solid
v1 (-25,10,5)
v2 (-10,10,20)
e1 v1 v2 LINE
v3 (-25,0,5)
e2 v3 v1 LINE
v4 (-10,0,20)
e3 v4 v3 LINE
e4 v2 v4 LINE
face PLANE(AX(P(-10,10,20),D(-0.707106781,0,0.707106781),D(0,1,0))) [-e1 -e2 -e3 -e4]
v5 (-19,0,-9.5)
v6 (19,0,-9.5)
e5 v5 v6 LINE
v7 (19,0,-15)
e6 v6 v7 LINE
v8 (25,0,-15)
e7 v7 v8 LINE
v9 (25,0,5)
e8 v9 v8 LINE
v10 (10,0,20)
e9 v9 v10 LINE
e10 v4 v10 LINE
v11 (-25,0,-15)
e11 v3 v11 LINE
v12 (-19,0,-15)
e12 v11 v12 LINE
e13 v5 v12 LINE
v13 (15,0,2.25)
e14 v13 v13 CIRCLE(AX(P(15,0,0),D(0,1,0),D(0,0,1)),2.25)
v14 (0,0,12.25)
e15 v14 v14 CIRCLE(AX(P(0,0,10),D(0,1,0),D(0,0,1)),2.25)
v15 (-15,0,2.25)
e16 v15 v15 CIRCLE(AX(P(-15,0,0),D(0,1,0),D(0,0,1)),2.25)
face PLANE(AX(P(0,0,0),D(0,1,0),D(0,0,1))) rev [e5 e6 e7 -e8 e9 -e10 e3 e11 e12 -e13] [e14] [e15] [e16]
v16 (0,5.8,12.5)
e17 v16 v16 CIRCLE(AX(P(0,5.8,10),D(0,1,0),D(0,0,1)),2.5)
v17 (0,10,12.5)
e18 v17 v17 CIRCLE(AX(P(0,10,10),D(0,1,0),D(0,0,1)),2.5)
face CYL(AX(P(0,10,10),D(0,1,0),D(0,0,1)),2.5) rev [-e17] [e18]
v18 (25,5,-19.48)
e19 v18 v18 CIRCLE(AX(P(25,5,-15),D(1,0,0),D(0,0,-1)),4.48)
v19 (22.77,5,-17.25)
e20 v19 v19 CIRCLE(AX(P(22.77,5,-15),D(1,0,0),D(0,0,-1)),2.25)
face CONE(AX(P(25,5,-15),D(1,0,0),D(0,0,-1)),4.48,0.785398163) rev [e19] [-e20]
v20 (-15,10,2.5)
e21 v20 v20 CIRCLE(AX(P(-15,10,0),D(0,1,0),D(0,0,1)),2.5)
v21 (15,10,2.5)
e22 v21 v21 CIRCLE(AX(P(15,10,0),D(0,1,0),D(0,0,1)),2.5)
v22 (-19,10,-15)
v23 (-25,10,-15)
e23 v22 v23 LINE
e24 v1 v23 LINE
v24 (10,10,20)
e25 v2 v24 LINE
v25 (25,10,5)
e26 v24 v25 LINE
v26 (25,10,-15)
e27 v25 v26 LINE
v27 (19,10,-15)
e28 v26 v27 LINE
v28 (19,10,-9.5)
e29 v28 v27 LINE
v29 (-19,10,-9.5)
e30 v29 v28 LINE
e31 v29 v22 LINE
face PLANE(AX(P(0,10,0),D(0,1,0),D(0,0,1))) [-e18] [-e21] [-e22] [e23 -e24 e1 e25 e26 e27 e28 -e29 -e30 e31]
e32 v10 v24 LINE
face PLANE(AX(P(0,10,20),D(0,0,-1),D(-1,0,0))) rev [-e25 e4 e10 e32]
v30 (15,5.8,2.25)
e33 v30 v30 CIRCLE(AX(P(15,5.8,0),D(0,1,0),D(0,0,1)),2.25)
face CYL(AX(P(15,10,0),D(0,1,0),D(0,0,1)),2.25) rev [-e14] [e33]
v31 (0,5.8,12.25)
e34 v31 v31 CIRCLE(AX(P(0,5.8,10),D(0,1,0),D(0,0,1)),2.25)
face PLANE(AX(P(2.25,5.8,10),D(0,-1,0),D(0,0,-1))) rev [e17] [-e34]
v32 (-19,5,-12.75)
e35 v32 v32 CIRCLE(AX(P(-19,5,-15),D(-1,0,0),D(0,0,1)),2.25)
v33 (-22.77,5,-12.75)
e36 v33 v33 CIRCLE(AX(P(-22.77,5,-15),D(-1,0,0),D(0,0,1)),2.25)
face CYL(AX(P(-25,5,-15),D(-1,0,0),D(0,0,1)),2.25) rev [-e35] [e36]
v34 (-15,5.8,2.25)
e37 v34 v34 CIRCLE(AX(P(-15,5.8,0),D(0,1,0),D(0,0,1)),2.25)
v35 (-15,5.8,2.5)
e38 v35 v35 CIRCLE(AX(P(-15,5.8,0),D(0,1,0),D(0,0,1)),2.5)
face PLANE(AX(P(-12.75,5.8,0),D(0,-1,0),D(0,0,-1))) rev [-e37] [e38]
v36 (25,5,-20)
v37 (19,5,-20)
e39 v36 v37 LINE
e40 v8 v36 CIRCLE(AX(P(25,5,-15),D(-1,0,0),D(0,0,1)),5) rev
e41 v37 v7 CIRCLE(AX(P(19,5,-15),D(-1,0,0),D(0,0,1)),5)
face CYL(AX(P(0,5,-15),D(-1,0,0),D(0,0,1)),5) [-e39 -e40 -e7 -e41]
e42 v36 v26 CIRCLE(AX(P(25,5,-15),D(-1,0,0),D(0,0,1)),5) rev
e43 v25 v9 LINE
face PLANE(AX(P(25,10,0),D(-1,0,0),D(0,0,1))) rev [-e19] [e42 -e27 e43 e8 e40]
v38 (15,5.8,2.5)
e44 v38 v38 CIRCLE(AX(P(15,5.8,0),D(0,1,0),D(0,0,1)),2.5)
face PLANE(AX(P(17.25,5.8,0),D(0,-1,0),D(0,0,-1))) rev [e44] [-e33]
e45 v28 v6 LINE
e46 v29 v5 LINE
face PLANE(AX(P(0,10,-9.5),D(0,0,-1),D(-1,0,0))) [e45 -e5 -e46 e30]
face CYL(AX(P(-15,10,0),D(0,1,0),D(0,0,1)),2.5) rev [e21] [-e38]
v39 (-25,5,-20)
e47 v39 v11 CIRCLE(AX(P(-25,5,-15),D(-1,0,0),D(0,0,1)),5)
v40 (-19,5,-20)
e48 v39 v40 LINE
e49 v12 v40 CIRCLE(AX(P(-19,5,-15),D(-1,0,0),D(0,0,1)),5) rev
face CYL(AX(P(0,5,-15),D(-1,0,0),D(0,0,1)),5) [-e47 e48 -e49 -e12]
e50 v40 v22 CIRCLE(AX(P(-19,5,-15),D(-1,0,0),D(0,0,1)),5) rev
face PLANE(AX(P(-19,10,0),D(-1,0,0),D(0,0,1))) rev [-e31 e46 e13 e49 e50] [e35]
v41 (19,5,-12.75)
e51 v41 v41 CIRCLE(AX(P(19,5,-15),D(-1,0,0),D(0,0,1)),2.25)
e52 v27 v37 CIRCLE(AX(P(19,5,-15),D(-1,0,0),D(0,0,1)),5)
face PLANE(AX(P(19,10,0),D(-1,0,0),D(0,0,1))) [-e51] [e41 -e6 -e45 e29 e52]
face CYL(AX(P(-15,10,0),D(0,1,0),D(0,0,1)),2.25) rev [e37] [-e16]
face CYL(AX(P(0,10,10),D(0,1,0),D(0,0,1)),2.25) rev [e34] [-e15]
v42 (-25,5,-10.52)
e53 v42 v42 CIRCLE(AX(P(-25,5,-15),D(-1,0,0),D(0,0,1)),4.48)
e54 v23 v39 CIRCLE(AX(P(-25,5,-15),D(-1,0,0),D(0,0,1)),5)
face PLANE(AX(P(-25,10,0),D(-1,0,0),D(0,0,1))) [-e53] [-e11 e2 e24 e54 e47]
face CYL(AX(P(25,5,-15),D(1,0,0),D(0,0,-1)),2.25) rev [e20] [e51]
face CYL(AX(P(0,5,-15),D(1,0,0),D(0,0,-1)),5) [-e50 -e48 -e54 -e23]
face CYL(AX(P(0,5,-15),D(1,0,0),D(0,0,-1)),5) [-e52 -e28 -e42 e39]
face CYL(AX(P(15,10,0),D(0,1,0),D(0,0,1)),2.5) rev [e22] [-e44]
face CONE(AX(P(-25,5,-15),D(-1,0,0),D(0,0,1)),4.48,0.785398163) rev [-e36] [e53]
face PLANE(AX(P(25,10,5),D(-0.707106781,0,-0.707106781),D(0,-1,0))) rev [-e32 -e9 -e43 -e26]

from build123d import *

# Parameters (mm, degrees)
BOSS_EXTRUDE1_DEPTH                     = 10
FILLET1_R                               = 5
CBORE_FOR_M5_HEX_HEAD_BOLT1_D           = 4.5
CBORE_FOR_M5_HEX_HEAD_BOLT1_DEPTH       = 10
CBORE_FOR_M5_HEX_HEAD_BOLT1_CBORE_D     = 5
CBORE_FOR_M5_HEX_HEAD_BOLT1_CBORE_DEPTH = 4.2
CBORE_FOR_M5_HEX_HEAD_BOLT1_TIP         = 1.351936393
CHAMFER1_SIZE                           = 15


with BuildPart() as part:
    # Sketch1 → Boss-Extrude1 (new body)
    with BuildSketch(Plane(origin=(0, 0, 0), x_dir=(1, 0, 0), z_dir=(0, 1, 0))):
        Polygon((-25, 20), (-25, -20), (25, -20), (25, 20), (19, 20), (19, 9.5), (-19, 9.5), (-19, 20), align=None)
    extrude(amount=BOSS_EXTRUDE1_DEPTH)

    # Fillet1
    fillet1_edges = [part.edges().sort_by_distance(p)[0] for p in [
        (22, 10, -20),
        (22, 0, -20),
        (-22, 0, -20),
        (-22, 10, -20),
    ]]
    fillet(fillet1_edges, radius=FILLET1_R - 0.0001)  # a hair under: the kernel refuses the full size

    # Sketch3 → CSK for M4 SFHCS1 (revolve, cut)
    with BuildSketch(Plane(origin=(25, 5, -15), x_dir=(0, 0, -1), z_dir=(0, 1, 0))):
        Polygon((0, 0), (0, 11.351936393), (2.25, 10), (2.25, 2.23), (4.48, 0), align=None)
    csk_for_m4_sfhcs1 = revolve(axis=Axis((31.35, 5, -15), (-1, 0, 0)), mode=Mode.SUBTRACT)

    # Mirror1: CSK for M4 SFHCS1 across plane
    add(csk_for_m4_sfhcs1.mirror(Plane(origin=(0, 0, 0), x_dir=(0, 0, 1), z_dir=(1, 0, 0))), mode=Mode.SUBTRACT)

    # CBORE for M5 Hex Head Bolt1
    with Locations(Plane(origin=(0, 10, 0), x_dir=(1, 0, 0), z_dir=(0, 1, 0))):
        with Locations((-15, 0), (15, 0), (0, -10)):
            CounterBoreHole(CBORE_FOR_M5_HEX_HEAD_BOLT1_D / 2, CBORE_FOR_M5_HEX_HEAD_BOLT1_CBORE_D / 2, CBORE_FOR_M5_HEX_HEAD_BOLT1_CBORE_DEPTH, depth=CBORE_FOR_M5_HEX_HEAD_BOLT1_DEPTH)
            with Locations((0, 0, -(CBORE_FOR_M5_HEX_HEAD_BOLT1_DEPTH + CBORE_FOR_M5_HEX_HEAD_BOLT1_TIP / 2))):  # 118° drill point
                Cone(0, CBORE_FOR_M5_HEX_HEAD_BOLT1_D / 2, CBORE_FOR_M5_HEX_HEAD_BOLT1_TIP, mode=Mode.SUBTRACT)

    # Chamfer1
    chamfer1_edges = [part.edges().sort_by_distance(p)[0] for p in [
        (25, 5, 20),
        (-25, 5, 20),
    ]]
    chamfer(chamfer1_edges, length=CHAMFER1_SIZE)


solid = part.part
